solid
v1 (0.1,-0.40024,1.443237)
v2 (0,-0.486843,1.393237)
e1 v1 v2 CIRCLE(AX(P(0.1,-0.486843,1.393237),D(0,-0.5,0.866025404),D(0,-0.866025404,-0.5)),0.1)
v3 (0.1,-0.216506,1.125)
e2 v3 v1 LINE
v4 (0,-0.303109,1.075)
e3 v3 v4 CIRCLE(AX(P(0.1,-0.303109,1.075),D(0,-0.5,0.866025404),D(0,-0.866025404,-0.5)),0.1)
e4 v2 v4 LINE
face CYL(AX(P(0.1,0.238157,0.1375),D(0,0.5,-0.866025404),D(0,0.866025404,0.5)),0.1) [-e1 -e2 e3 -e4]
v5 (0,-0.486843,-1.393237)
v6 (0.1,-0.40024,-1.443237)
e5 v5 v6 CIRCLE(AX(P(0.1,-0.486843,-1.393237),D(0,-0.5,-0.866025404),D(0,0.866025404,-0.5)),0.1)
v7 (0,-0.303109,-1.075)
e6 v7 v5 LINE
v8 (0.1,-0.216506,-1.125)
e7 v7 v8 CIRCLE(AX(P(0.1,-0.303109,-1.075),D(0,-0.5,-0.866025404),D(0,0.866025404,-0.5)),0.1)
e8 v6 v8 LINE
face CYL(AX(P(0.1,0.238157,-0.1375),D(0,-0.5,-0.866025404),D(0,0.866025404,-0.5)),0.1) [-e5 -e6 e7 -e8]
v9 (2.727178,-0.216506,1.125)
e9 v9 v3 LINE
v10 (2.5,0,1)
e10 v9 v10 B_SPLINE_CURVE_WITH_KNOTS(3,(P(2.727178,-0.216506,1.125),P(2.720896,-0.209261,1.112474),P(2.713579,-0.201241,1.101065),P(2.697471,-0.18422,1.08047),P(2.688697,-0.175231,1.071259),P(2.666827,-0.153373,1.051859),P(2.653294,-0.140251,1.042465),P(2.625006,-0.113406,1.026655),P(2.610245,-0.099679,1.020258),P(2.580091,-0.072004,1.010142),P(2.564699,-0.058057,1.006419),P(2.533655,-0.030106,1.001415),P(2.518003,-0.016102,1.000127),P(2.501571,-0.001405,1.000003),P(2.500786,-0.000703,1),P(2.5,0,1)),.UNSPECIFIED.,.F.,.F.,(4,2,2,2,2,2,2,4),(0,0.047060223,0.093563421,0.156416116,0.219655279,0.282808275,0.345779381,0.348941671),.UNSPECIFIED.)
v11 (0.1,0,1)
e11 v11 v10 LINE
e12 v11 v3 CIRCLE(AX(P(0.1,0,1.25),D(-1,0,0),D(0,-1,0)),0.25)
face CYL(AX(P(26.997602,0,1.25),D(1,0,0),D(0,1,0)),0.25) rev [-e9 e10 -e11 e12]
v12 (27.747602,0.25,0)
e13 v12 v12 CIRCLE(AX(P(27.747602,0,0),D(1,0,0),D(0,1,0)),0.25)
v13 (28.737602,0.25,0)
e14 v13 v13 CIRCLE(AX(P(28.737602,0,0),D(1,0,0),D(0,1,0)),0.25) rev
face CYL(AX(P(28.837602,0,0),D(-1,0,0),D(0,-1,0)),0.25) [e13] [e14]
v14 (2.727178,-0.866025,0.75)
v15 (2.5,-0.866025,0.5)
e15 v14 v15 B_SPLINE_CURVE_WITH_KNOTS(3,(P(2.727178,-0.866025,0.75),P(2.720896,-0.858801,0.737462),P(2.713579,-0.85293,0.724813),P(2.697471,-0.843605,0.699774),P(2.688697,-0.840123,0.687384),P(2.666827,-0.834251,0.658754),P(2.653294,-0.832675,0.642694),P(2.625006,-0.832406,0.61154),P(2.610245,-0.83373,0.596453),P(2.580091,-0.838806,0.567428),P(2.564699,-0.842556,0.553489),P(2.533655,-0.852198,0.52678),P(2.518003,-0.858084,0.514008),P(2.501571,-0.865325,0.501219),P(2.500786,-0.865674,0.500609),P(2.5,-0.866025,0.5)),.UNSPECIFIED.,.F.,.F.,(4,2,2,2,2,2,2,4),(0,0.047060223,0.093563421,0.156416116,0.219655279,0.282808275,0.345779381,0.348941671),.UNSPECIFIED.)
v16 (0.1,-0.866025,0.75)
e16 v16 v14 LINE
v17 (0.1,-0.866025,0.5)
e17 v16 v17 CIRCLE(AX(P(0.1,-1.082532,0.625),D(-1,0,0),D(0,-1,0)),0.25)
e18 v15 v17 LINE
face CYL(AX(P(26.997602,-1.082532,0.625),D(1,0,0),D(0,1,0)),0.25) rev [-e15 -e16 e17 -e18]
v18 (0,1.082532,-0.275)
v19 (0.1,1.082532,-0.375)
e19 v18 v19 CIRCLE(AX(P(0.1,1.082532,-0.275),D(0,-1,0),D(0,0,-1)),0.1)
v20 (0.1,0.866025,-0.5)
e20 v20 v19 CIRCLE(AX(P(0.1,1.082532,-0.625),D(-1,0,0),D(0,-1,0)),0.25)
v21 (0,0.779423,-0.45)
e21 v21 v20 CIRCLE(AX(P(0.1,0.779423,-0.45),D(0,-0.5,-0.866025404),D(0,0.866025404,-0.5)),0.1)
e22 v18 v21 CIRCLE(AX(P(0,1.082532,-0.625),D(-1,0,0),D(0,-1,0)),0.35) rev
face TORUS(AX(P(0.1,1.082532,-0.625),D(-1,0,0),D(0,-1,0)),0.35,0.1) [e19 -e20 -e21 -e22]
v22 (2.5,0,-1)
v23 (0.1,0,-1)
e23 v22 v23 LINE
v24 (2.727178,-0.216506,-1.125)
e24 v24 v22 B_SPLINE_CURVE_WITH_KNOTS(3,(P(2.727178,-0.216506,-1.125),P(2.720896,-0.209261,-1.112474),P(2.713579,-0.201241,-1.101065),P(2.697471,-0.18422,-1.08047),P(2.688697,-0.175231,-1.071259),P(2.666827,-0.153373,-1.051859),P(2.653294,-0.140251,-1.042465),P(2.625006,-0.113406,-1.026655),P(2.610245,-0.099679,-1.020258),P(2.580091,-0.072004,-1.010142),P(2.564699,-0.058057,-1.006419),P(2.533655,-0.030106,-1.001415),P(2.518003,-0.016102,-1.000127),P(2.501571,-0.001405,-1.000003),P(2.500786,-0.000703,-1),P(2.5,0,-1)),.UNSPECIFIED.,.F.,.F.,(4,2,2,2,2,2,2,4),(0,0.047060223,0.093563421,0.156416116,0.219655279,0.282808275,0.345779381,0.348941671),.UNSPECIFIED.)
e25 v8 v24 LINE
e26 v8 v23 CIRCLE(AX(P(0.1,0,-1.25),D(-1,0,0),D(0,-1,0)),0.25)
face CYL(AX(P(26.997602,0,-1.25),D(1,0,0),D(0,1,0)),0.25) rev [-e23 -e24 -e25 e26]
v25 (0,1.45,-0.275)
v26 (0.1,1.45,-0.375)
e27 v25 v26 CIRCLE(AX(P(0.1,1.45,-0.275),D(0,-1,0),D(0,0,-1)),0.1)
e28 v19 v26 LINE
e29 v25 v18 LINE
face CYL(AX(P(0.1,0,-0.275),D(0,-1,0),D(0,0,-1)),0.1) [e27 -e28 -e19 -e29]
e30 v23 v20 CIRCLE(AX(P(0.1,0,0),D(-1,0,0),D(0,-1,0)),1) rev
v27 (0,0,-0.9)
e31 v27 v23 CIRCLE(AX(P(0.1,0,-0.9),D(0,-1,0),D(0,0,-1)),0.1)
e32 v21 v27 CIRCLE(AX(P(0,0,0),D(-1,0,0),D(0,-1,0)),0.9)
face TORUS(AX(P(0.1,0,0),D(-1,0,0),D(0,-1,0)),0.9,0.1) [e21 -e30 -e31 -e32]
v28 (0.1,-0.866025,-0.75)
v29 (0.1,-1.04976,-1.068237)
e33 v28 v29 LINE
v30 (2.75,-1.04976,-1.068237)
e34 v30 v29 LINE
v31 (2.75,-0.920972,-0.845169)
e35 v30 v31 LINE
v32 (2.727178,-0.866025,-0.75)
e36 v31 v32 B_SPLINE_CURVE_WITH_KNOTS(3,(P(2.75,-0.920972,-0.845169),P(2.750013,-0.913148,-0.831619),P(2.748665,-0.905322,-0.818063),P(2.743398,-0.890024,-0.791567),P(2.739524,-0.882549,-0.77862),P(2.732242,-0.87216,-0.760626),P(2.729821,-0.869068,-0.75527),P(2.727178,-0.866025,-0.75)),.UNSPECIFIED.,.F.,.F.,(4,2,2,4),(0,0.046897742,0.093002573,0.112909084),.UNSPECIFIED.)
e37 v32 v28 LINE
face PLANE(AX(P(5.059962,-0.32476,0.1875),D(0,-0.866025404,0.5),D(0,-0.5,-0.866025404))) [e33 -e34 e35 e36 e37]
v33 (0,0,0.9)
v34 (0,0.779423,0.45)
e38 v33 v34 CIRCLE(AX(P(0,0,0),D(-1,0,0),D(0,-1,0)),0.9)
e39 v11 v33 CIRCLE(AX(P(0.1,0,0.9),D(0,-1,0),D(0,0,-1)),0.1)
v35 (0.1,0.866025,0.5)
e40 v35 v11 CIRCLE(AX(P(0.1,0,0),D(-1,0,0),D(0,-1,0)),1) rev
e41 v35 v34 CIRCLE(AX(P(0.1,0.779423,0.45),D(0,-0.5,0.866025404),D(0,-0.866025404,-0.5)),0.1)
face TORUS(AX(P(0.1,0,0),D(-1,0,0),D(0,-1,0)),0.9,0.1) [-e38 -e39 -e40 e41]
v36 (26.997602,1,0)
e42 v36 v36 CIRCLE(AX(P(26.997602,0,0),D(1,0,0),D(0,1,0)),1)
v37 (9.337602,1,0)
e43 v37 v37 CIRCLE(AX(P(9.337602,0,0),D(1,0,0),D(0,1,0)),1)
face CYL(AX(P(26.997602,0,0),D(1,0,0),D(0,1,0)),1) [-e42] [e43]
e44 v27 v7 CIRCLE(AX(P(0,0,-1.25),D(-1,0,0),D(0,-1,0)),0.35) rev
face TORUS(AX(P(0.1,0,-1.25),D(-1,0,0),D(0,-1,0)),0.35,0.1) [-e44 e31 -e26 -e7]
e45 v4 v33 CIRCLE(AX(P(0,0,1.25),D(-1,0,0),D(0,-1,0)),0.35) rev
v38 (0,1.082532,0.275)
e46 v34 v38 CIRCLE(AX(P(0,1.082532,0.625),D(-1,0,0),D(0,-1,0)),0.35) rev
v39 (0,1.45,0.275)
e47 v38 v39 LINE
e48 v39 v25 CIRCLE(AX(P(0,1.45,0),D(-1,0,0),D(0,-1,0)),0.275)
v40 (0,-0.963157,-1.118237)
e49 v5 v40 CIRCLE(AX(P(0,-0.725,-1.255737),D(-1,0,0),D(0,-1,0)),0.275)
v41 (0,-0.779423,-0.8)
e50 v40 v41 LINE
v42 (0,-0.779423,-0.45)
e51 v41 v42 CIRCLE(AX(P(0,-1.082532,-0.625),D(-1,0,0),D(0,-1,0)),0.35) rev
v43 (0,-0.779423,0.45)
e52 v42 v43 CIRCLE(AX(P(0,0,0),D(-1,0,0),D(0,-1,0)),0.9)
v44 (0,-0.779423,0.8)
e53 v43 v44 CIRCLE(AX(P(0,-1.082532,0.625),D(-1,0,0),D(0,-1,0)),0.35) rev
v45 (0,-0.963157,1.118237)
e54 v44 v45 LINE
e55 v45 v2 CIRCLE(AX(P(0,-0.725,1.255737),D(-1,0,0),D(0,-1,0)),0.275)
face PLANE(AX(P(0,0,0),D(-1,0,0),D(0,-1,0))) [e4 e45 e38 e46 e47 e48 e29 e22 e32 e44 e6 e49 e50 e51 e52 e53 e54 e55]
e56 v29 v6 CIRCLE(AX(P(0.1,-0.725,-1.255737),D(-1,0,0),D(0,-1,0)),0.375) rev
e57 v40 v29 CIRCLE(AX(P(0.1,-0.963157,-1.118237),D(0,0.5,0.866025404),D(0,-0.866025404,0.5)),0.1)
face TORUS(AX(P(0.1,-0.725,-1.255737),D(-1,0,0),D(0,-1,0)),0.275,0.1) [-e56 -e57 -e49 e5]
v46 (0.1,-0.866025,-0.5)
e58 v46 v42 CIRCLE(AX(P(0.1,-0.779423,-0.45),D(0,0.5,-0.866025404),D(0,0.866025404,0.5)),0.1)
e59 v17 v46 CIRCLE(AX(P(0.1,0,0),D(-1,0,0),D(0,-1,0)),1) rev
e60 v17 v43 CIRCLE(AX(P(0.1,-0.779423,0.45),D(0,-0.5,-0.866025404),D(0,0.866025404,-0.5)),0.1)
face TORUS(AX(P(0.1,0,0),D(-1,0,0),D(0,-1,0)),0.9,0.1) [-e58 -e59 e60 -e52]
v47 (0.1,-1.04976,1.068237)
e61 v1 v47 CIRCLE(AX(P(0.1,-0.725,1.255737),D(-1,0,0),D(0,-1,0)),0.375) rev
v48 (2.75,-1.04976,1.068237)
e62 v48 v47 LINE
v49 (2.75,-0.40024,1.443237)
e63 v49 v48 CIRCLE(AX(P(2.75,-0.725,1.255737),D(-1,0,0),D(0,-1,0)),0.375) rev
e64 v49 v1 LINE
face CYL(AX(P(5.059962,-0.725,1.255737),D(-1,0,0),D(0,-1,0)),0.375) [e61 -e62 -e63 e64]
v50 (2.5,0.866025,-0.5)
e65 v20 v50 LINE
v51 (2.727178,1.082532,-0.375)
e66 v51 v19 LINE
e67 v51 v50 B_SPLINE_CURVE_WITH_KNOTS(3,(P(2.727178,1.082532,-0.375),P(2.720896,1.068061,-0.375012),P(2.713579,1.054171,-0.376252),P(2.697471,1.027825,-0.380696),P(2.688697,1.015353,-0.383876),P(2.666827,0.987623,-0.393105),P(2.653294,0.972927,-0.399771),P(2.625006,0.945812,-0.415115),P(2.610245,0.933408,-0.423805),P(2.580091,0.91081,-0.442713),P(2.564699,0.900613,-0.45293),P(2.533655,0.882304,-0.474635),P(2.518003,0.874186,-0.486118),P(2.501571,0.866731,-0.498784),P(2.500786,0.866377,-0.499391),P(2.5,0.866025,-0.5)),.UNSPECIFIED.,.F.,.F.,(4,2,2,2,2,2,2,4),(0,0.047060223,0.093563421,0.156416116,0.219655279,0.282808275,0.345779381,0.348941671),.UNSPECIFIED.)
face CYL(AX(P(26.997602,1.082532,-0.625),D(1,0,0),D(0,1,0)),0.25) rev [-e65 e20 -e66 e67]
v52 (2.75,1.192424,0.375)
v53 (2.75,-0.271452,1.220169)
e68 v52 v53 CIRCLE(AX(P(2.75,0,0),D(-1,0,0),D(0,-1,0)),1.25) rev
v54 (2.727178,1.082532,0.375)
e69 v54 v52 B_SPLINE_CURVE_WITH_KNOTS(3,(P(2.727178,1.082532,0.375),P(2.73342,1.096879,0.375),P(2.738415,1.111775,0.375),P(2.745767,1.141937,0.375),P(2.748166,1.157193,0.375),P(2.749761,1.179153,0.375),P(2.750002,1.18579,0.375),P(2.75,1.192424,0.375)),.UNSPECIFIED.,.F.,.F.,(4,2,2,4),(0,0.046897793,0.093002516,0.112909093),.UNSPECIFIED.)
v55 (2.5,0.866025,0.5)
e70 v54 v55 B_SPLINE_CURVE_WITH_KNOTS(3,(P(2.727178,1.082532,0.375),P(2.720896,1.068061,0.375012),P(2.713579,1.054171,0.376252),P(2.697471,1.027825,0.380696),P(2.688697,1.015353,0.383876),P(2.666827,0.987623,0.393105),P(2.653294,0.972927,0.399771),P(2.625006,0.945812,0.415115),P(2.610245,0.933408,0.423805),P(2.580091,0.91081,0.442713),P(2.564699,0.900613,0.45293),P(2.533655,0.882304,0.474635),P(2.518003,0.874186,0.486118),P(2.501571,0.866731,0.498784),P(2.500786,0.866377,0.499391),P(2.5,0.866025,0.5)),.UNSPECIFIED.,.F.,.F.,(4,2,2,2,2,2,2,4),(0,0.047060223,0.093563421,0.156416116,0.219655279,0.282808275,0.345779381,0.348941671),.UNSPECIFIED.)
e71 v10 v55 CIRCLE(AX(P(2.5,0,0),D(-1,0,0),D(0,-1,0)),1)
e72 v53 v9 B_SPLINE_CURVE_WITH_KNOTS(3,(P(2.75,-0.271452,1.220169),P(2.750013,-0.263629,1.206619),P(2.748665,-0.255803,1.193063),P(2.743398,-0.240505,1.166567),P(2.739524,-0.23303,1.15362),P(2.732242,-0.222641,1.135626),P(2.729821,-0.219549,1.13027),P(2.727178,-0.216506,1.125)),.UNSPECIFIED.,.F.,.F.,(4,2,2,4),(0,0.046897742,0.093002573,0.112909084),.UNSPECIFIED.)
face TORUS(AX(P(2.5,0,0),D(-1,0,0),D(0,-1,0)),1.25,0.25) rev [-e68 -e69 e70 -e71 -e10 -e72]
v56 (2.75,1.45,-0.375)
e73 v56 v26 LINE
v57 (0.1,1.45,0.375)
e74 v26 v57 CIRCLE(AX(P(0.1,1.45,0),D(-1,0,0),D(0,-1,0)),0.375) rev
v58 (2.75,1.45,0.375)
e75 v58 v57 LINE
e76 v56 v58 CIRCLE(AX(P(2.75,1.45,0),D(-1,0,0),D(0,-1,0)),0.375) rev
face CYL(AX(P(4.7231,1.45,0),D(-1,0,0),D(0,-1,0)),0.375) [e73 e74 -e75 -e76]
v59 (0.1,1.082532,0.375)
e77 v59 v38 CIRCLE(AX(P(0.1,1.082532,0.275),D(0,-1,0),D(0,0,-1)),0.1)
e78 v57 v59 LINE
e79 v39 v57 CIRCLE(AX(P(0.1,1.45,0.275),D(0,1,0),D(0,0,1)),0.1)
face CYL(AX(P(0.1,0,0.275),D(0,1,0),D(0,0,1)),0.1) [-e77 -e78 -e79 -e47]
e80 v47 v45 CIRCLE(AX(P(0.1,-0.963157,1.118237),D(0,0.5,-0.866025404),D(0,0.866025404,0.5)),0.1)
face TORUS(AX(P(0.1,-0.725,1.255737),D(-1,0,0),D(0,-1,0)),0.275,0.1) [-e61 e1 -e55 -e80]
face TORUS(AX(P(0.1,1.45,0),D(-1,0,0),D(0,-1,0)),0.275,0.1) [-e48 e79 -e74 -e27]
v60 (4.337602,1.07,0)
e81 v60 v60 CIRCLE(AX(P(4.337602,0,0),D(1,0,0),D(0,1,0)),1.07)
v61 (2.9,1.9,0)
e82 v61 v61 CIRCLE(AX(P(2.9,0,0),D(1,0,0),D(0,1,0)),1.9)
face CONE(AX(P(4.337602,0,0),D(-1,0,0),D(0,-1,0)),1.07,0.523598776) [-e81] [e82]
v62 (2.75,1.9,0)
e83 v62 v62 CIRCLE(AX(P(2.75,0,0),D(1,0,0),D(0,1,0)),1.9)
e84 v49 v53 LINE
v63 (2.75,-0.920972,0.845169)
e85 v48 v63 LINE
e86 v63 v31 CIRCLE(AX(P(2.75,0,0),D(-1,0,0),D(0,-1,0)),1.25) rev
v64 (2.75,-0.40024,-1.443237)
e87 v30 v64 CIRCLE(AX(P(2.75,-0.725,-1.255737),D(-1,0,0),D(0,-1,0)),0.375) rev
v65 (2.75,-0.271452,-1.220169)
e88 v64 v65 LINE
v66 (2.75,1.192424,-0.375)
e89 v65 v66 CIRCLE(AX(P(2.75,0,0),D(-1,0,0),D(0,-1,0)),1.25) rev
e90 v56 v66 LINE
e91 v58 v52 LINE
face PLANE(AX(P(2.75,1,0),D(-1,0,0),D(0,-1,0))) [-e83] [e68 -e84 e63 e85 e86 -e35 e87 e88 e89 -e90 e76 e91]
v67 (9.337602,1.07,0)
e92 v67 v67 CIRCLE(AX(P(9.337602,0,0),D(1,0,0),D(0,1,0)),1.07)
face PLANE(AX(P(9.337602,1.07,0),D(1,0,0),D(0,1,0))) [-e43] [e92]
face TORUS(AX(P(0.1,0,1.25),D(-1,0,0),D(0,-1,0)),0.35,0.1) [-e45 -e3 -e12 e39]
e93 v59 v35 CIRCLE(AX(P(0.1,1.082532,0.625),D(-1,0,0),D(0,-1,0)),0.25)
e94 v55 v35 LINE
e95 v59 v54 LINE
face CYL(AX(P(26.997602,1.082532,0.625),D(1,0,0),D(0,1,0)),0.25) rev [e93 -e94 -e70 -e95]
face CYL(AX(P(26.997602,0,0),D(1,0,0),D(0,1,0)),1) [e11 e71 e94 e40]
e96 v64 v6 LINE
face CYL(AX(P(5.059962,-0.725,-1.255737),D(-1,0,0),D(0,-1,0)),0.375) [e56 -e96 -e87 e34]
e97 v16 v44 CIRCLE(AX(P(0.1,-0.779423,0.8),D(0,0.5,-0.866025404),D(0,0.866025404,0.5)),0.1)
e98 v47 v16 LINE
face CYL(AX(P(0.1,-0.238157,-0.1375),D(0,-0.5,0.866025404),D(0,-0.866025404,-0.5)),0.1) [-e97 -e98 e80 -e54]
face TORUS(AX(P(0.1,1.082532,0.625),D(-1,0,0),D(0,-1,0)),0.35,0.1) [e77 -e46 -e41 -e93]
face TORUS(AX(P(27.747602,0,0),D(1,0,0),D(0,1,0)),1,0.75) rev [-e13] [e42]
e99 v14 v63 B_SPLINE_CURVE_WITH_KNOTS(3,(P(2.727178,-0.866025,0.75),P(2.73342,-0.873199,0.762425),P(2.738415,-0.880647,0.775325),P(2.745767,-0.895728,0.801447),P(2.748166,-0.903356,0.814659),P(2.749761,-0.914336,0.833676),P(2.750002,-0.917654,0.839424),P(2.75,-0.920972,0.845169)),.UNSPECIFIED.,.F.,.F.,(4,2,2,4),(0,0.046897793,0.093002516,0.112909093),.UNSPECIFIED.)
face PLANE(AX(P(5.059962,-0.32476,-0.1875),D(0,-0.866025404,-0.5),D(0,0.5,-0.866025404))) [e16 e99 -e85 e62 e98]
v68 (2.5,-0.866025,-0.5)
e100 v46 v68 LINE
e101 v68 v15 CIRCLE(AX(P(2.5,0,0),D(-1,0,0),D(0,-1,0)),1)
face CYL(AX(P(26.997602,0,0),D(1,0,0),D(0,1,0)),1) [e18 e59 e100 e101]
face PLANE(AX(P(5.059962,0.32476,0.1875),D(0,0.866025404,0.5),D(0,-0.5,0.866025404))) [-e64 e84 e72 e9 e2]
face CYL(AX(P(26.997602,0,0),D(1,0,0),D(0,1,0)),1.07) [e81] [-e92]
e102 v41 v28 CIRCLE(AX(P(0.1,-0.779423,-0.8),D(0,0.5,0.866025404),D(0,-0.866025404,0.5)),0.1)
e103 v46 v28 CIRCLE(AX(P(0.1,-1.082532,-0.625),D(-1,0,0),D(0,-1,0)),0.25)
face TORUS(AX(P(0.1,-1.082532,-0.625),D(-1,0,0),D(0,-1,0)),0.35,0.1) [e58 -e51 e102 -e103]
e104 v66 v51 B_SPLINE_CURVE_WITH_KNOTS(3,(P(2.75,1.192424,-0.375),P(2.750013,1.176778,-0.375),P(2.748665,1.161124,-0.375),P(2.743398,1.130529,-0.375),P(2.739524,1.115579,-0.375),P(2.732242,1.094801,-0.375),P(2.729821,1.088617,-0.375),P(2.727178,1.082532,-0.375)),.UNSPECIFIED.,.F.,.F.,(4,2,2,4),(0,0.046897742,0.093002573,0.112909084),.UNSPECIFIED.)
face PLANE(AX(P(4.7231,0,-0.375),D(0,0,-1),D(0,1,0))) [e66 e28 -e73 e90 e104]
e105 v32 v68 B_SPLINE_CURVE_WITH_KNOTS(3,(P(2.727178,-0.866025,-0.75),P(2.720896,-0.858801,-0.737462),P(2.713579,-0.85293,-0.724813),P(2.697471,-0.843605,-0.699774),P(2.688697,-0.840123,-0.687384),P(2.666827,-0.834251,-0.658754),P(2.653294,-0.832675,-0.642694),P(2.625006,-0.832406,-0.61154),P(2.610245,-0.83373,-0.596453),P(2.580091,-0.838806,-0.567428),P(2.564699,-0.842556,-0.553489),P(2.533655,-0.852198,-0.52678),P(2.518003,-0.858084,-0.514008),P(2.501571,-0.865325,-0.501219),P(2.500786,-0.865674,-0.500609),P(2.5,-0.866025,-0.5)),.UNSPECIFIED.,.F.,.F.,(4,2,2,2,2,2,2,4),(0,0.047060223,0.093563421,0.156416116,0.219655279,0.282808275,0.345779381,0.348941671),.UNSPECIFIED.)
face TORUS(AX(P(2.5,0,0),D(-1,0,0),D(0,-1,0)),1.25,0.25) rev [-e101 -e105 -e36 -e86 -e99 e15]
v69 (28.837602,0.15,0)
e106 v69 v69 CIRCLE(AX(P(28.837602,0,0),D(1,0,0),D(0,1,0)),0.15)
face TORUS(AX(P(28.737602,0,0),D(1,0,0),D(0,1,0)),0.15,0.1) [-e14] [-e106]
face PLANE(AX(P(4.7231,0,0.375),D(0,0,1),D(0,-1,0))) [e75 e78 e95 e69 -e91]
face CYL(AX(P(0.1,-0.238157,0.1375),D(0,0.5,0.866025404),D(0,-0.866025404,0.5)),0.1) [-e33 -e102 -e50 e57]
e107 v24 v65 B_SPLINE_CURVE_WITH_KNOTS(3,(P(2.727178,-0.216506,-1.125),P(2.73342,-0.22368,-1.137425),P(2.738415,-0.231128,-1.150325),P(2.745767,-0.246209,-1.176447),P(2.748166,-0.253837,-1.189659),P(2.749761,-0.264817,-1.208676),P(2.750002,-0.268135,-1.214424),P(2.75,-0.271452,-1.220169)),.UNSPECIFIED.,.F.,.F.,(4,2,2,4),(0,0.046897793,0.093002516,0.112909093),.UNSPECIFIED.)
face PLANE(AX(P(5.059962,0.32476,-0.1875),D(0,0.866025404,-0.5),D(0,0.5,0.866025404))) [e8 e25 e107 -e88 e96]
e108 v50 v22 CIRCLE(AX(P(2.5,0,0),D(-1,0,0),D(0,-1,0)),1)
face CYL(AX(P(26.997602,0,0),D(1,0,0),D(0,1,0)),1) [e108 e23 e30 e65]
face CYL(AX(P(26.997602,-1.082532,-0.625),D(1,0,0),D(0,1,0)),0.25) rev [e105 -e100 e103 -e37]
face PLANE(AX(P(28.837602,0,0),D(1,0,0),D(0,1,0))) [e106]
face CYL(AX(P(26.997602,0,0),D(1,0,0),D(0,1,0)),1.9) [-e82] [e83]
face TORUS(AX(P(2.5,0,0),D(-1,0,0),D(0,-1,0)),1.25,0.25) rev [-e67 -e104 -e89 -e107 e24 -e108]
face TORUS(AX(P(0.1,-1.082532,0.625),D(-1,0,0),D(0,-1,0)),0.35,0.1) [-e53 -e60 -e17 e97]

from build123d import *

# Parameters (mm, degrees)
Y_KSEKLIK_EKSTR_ZYON1_DEPTH = 2.75
DAIRESEL_KAPLAMA1_COUNT     = 3
RADYUS1_R                   = 0.25
IZIM3_R                     = 0.25
Y_KSEKLIK_EKSTR_ZYON2_DEPTH = 1.84
RADYUS2_R                   = 0.75
RADYUS3_R                   = 0.1


with BuildPart() as part:
    # Çizim1 → Döndür1 (revolve)
    with BuildSketch(Plane.XY):
        Polygon((0, 0), (0, 1), (2.75, 1), (2.75, 1.9), (2.9, 1.9), (4.33760217, 1.07), (9.33760217, 1.07), (9.33760217, 1), (26.99760217, 1), (26.99760217, 0), align=None)
    revolve(axis=Axis((26.99760217, 0, 0), (-1, 0, 0)))

    # Çizim2 → Yükseklik-Ekstrüzyon1 (add)
    with BuildSketch(Plane.ZY):
        with BuildLine():
            Line((-0.375, 0), (0.375, 0))
            Line((0.375, 0), (0.375, 1.45))
            ThreePointArc((0.375, 1.45), (0, 1.825), (-0.375, 1.45))
            Line((-0.375, 1.45), (-0.375, 0))
        make_face()
    y_kseklik_ekstr_zyon1 = extrude(amount=-Y_KSEKLIK_EKSTR_ZYON1_DEPTH)

    # Dairesel Kaplama1: Yükseklik-Ekstrüzyon1 ×3 about axis
    dairesel_kaplama1_axis = Axis((0, 0, 0), (1, 0, 0))
    for i in range(1, DAIRESEL_KAPLAMA1_COUNT):
        add(y_kseklik_ekstr_zyon1.rotate(dairesel_kaplama1_axis, i * 360 / DAIRESEL_KAPLAMA1_COUNT))

    # Radyus1
    radyus1_edges = [part.edges().sort_by_distance(p)[0] for p in [
        (2.75, 0.5, 0.866025404),
        (1.375, 0.927024811, -0.375),
        (1.375, 0.927024811, 0.375),
        (2.75, -1, 0),
        (2.75, 0.5, -0.866025404),
        (1.375, -0.138752879, 0.990327036),
        (1.375, -0.788271932, 0.615327036),
        (1.375, -0.788271932, -0.615327036),
        (1.375, -0.138752879, -0.990327036),
    ]]
    fillet(radyus1_edges, radius=RADYUS1_R)

    # Çizim3 → Yükseklik-Ekstrüzyon2 (add)
    with BuildSketch(Plane(origin=(26.99760217, 0, 0), x_dir=(0, 0, -1), z_dir=(1, 0, 0))):
        with Locations(Location((0, 0, 0), (0, 0, 90))):
            Circle(IZIM3_R)
    extrude(amount=Y_KSEKLIK_EKSTR_ZYON2_DEPTH)

    # Radyus2
    radyus2_edges = [part.edges().sort_by_distance(p)[0] for p in [
        (26.99760217, -0.25, 0),
    ]]
    fillet(radyus2_edges, radius=RADYUS2_R - 0.0001)  # a hair under: the kernel refuses the full size

    # Radyus3
    radyus3_edges = [part.edges().sort_by_distance(p)[0] for p in [
        (28.83760217, -0.25, 0),
        (0, 1.825, 0),
        (0, 1.266265877, -0.375),
        (0, -0.9125, -1.580496362),
        (0, -0.957892465, -0.909118418),
        (0, -0.9125, 1.580496362),
        (0, -0.308373412, 1.284118418),
        (0, 0.4999999999999995, -0.8660254037844389),
        (0, -0.308373412, -1.284118418),
        (0, -1, 0),
        (0, -0.957892465, 0.909118418),
        (0, 0.49999999999999933, 0.866025403784439),
        (0, 1.266265877, 0.375),
        (0, 0.957531755, -0.408493649),
        (0, -0.125, -1.033493649),
        (0, -0.832531755, -0.625),
        (0, -0.832531755, 0.625),
        (0, -0.125, 1.033493649),
        (0, 0.957531755, 0.408493649),
    ]]
    fillet(radyus3_edges, radius=RADYUS3_R)


solid = part.part
